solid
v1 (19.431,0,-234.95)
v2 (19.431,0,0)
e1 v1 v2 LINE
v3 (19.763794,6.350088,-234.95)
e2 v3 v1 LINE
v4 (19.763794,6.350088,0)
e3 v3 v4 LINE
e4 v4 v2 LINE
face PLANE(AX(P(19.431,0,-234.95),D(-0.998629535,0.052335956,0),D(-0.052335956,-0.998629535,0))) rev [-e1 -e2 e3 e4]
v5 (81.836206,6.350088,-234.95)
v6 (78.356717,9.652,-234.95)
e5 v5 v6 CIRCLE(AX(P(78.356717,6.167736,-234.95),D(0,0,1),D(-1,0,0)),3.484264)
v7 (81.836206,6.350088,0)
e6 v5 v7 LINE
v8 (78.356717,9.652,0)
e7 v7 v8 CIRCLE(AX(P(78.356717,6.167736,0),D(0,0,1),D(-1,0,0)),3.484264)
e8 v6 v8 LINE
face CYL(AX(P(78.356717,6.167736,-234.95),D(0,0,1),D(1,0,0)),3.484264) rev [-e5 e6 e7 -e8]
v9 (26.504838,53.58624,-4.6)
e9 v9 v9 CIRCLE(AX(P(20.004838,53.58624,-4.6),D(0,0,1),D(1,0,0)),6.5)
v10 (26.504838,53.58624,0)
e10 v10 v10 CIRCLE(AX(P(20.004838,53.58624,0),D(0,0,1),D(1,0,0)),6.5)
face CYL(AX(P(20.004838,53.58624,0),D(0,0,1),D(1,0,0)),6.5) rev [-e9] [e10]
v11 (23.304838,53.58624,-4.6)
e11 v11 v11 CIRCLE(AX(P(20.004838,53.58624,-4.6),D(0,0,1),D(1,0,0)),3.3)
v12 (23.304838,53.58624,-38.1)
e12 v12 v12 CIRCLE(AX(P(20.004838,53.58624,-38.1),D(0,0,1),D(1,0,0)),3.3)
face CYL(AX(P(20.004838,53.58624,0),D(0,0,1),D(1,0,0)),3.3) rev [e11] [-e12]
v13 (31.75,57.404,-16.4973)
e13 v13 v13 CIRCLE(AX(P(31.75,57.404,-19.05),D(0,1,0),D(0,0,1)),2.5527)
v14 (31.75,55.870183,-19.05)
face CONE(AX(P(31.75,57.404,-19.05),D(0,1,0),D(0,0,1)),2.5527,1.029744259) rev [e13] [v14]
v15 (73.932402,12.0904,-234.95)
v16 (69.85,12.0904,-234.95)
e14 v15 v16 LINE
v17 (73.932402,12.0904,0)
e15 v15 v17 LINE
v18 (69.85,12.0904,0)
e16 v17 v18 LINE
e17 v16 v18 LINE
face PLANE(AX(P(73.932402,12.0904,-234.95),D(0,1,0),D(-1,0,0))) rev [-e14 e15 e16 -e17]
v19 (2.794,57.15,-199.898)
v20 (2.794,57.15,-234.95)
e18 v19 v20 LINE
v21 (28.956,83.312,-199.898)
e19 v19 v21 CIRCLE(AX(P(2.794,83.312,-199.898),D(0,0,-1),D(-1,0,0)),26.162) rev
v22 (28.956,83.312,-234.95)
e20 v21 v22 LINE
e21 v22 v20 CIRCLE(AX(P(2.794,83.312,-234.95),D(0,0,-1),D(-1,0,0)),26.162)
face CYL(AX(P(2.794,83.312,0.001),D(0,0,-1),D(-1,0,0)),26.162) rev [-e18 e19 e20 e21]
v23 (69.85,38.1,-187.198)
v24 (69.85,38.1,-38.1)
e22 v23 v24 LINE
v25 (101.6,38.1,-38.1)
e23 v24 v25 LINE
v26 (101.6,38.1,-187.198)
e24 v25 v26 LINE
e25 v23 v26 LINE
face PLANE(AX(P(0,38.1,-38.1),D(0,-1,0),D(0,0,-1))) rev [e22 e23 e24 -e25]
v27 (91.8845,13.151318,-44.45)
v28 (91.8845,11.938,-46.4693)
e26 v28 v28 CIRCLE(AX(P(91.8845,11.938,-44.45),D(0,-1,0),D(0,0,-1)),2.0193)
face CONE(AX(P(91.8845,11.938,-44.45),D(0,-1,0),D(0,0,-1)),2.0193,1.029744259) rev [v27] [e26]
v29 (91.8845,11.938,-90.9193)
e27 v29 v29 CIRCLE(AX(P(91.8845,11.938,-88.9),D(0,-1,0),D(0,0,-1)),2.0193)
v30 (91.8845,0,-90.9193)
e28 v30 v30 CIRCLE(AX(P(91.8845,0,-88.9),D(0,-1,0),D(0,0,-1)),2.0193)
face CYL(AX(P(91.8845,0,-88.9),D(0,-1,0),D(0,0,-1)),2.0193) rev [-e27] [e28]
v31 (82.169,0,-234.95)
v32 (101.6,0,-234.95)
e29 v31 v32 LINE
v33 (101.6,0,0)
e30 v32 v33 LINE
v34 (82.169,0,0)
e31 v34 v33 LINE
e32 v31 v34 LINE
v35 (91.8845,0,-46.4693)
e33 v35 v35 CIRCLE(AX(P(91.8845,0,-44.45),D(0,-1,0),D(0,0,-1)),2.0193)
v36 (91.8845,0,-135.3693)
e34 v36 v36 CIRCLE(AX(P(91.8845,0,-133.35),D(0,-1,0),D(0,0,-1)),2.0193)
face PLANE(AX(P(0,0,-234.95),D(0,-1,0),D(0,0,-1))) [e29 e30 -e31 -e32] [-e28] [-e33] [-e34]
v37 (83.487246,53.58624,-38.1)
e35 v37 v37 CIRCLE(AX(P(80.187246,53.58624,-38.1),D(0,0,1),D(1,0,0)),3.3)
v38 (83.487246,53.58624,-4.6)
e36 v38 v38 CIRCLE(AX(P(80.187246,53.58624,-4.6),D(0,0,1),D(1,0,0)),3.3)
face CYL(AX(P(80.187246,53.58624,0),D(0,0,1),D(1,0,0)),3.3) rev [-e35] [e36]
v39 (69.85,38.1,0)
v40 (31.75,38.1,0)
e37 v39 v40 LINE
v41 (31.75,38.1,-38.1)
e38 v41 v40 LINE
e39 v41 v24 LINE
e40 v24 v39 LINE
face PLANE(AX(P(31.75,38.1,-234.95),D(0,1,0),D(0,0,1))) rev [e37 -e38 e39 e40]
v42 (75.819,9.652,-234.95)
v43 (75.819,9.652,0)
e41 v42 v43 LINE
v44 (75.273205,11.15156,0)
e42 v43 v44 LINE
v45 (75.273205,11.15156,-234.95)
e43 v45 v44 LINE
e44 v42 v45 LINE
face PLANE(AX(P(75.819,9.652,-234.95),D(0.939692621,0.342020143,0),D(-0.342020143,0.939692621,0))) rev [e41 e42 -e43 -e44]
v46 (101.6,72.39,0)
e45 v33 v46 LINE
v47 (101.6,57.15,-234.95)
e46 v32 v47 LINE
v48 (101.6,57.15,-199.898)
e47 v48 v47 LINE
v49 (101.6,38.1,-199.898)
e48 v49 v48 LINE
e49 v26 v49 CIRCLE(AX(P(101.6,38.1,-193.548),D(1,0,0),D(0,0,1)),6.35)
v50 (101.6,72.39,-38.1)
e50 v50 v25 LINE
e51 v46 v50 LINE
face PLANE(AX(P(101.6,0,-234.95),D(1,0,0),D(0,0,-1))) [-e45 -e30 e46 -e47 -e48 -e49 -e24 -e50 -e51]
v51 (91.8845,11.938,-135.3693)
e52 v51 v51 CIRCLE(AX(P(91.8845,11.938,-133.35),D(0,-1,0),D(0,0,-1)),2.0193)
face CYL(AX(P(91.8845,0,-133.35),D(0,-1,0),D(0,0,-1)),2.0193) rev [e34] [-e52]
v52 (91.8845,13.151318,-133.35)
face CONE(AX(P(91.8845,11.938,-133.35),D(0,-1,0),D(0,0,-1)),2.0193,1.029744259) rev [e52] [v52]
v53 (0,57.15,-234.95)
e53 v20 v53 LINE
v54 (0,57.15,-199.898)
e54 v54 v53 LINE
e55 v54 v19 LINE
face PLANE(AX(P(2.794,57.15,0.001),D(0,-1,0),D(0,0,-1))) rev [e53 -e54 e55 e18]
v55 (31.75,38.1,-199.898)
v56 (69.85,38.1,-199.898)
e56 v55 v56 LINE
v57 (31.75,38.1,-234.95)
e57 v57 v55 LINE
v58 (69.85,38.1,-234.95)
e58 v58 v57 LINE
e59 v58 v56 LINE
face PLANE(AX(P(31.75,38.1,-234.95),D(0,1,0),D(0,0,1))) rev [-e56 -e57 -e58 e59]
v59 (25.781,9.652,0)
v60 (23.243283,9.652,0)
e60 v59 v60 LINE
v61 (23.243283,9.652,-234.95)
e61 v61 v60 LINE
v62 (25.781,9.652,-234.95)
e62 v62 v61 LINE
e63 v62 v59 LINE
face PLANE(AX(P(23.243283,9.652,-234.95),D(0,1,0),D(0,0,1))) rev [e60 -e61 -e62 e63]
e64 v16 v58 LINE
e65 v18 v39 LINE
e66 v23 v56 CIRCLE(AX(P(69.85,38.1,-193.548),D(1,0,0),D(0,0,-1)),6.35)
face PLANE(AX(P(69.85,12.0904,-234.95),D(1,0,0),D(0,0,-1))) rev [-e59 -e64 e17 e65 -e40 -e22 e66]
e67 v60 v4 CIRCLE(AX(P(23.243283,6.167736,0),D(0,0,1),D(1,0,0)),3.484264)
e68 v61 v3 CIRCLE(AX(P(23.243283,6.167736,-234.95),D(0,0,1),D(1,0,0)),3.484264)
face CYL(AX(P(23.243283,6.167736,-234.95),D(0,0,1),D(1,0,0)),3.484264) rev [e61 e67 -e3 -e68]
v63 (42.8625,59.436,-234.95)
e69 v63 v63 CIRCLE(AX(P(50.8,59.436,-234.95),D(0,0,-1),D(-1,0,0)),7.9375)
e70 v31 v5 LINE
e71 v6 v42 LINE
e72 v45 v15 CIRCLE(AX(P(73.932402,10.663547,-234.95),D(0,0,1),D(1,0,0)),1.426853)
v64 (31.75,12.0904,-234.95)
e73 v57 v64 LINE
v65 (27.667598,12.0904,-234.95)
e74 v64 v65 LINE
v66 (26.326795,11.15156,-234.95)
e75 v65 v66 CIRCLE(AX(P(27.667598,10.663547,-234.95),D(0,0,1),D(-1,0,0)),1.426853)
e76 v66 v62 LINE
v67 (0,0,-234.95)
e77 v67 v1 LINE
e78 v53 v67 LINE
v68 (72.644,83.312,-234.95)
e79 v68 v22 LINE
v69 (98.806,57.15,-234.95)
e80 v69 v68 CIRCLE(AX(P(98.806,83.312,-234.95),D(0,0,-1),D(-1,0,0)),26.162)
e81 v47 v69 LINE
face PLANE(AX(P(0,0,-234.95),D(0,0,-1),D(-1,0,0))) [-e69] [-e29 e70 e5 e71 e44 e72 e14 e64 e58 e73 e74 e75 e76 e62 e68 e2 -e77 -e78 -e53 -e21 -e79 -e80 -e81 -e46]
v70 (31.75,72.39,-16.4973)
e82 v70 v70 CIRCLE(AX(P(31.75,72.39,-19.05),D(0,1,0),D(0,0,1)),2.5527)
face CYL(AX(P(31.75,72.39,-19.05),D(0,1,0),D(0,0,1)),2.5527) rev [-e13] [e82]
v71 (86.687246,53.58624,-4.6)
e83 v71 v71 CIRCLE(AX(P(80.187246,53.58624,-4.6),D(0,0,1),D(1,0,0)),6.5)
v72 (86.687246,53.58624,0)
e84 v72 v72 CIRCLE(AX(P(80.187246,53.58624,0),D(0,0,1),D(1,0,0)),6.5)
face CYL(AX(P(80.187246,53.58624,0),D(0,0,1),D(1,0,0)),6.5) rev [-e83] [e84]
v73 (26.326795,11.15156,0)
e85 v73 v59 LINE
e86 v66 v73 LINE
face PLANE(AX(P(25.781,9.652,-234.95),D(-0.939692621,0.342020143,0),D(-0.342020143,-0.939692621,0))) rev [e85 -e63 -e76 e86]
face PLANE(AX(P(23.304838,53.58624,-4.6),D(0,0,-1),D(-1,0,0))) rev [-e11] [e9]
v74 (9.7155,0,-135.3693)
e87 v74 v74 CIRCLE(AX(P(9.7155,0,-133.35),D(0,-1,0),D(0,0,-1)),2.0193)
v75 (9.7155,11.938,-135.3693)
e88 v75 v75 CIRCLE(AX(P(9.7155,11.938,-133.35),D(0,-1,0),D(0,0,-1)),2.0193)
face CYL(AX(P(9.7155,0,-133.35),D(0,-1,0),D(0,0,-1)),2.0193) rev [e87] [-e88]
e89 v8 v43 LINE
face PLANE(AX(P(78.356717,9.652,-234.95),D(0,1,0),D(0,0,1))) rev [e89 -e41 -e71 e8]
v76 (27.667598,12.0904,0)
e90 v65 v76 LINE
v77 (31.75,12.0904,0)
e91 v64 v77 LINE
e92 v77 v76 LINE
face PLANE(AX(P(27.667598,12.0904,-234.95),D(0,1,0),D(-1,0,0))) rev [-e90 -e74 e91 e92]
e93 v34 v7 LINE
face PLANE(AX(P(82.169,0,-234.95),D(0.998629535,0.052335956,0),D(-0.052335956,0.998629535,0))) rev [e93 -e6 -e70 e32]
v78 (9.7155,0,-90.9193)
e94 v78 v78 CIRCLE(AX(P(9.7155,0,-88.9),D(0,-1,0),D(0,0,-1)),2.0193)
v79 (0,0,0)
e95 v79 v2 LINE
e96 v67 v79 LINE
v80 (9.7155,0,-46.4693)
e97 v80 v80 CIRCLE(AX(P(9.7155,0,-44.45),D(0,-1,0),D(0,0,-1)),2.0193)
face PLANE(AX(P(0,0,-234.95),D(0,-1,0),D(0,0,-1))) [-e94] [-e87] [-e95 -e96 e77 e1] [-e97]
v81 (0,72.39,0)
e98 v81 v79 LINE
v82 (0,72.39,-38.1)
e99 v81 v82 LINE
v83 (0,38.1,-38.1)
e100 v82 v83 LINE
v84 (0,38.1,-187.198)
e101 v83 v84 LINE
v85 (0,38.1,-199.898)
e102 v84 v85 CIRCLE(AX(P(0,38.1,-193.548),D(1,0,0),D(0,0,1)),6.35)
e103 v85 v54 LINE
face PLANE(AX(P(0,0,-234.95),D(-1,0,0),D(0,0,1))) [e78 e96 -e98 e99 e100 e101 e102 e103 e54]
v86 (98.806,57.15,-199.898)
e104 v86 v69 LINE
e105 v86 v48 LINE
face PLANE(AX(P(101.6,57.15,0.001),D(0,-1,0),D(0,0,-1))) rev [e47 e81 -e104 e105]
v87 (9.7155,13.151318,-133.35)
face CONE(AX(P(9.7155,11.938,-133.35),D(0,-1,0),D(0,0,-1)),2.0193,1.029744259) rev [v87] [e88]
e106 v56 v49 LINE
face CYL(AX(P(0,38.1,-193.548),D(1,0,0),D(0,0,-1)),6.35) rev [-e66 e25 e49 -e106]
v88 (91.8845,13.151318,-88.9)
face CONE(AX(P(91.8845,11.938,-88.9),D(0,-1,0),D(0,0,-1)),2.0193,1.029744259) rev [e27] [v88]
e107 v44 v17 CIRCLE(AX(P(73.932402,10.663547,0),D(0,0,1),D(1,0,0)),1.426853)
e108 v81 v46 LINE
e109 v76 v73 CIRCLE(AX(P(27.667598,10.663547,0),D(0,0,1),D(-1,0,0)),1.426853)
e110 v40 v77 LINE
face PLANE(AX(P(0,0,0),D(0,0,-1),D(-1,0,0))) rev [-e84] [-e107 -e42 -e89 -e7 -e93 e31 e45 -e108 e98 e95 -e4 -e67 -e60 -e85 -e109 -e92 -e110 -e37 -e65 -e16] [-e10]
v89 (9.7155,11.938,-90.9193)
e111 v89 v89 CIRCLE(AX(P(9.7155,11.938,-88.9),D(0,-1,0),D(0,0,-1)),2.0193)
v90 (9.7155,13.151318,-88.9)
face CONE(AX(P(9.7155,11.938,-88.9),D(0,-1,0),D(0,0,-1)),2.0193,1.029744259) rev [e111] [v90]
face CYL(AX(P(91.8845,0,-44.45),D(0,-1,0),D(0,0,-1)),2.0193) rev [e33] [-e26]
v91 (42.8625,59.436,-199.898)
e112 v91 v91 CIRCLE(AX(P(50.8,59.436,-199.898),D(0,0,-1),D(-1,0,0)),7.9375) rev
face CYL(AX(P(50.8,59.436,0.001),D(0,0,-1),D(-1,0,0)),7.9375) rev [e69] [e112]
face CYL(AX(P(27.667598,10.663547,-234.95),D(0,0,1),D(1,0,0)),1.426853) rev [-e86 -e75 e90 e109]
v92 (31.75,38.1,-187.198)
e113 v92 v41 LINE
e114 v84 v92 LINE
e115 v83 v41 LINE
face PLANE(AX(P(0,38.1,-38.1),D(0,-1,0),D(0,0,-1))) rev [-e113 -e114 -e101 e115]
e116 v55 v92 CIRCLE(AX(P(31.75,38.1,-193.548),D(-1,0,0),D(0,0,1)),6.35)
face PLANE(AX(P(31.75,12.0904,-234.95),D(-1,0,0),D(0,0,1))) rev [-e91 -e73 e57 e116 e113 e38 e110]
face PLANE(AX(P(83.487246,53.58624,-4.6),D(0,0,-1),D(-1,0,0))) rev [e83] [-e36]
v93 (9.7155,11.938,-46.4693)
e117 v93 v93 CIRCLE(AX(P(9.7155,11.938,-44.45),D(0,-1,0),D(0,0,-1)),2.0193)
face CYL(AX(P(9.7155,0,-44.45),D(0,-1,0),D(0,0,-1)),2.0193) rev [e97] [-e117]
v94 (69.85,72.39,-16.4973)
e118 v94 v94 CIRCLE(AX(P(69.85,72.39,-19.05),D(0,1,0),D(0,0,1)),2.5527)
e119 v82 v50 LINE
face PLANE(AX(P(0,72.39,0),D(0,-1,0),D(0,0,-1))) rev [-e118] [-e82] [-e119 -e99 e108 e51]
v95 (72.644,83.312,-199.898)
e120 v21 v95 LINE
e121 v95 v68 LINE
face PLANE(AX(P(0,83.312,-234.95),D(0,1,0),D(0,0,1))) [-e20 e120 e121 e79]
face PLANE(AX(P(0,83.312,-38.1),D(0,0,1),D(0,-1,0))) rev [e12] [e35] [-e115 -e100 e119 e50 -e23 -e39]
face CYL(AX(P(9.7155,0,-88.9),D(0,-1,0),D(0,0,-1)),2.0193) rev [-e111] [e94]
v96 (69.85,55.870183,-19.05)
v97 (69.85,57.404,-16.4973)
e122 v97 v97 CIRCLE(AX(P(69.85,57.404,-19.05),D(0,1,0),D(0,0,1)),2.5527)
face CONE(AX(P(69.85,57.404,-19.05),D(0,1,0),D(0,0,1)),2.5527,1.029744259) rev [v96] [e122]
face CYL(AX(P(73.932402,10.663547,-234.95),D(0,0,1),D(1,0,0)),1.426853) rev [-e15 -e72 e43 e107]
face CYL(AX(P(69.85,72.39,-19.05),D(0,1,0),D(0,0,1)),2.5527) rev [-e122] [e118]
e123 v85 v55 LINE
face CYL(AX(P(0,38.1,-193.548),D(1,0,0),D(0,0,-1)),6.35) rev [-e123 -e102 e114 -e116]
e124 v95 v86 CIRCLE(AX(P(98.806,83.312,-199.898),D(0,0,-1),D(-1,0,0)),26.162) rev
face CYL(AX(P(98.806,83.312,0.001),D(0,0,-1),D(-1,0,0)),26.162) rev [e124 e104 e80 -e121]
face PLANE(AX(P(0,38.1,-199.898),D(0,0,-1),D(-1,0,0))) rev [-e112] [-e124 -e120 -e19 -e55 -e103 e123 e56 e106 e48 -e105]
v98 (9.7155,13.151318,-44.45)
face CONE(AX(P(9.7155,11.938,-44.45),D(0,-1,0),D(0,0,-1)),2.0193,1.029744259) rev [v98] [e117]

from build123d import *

# Parameters (mm, degrees)
SKETCH1_W                                    = 101.6
SKETCH1_H                                    = 83.312
SOLID_EXTRUDE_DEPTH                          = 234.95
BOTTOM_SLIDE_WAY_CUT_EXTRUDE_DEPTH           = 270.193149697
THROAT_CASTING_CUT_EXTRUDE_DEPTH             = 270.193149697
SHOULDERS_SCREW_HOLE_CUT_EXTRUDE_REACH       = 271.193
SKETCH4_R                                    = 7.9375
CBORE_START                                  = -38.1
CBORE_FOR_M6_PAN_HEAD_MACHINE_SCREW1_OUT_R   = 3.3
CBORE_FOR_M6_PAN_HEAD_MACHINE_SCREW1_DEPTH   = 38.1
CBORE_START_2                                = -4.6
CBORE_FOR_M6_PAN_HEAD_MACHINE_SCREW1_2_O_R   = 6.5
CBORE_FOR_M6_PAN_HEAD_MACHINE_SCREW1_2_O_R_2 = 3.3
CBORE_FOR_M6_PAN_HEAD_MACHINE_SCREW1_2_DEPTH = 4.6
SKETCH7_W                                    = 38.1
SKETCH7_H                                    = 10.922
STATIONARY_JAW_TRIM_CUT_EXTRUDE1_DEPTH       = 270.193149697
F_1_4_20_TAPPED_HOLE1_D                      = 5.1054
F_1_4_20_TAPPED_HOLE1_DEPTH                  = 14.986
F_1_4_20_TAPPED_HOLE1_TIP                    = 1.533816902
F_10_32_TAPPED_HOLE1_D                       = 4.0386
F_10_32_TAPPED_HOLE1_DEPTH                   = 11.938
F_10_32_TAPPED_HOLE1_TIP                     = 1.213317848


# Read off the part's stored shape, not the designer's step: CBORE for M6 Pan Head Machine Screw1
with BuildPart() as part:
    # Sketch1 → Solid extrude (new body)
    with BuildSketch(Plane.XY):
        with Locations((50.8, 41.656)):
            Rectangle(SKETCH1_W, SKETCH1_H)
    extrude(amount=-SOLID_EXTRUDE_DEPTH)

    # Sketch2 → Bottom slide way cut extrude (cut, through all)
    with BuildSketch(Plane.XY):
        with BuildLine():
            Line((19.431, 0), (19.763794004, 6.35008787))
            ThreePointArc((19.763794004, 6.35008787), (20.84487401, 8.695131686), (23.243283382, 9.652))
            Line((23.243283382, 9.652), (25.781, 9.652))
            Line((25.781, 9.652), (26.326795038, 11.151559542))
            ThreePointArc((26.326795038, 11.151559542), (26.849188972, 11.832356572), (27.667598166, 12.0904))
            Line((27.667598166, 12.0904), (31.75, 12.0904))
            Line((31.75, 12.0904), (31.75, 38.1))
            Line((31.75, 38.1), (69.85, 38.1))
            Line((69.85, 38.1), (69.85, 12.0904))
            Line((69.85, 12.0904), (73.932401834, 12.0904))
            ThreePointArc((73.932401834, 12.0904), (74.750811028, 11.832356572), (75.273204962, 11.151559542))
            Line((75.273204962, 11.151559542), (75.819, 9.652))
            Line((75.819, 9.652), (78.356716618, 9.652))
            ThreePointArc((78.356716618, 9.652), (80.75512599, 8.695131686), (81.836205996, 6.35008787))
            Line((81.836205996, 6.35008787), (82.169, 0))
            Line((82.169, 0), (19.431, 0))
        make_face()
    extrude(amount=-BOTTOM_SLIDE_WAY_CUT_EXTRUDE_DEPTH, mode=Mode.SUBTRACT)

    # Sketch3 → Throat/casting cut extrude (cut, through all)
    with BuildSketch(Plane(origin=(101.6, 0, 0), x_dir=(0, 0, -1), z_dir=(1, 0, 0))):
        with BuildLine():
            Line((0, 74.58075), (19.05, 74.58075))
            ThreePointArc((19.05, 74.58075), (23.540128061, 76.440621939), (25.4, 80.93075))
            Line((25.4, 80.93075), (25.4, 83.312))
            Line((25.4, 83.312), (0, 83.312))
            Line((0, 83.312), (0, 74.58075))
        make_face()
        with BuildLine():
            Line((38.1, 83.312), (38.1, 38.1))
            Line((38.1, 38.1), (187.198, 38.1))
            ThreePointArc((187.198, 38.1), (193.548, 31.75), (199.898, 38.1))
            Line((199.898, 38.1), (199.898, 83.312))
            Line((199.898, 83.312), (38.1, 83.312))
        make_face()
    extrude(amount=-THROAT_CASTING_CUT_EXTRUDE_DEPTH, mode=Mode.SUBTRACT)

    # Sketch4 → Shoulders/screw hole cut extrude (cut, up to next)
    with BuildSketch(Plane(origin=(0, 0, -234.95), x_dir=(-1, 0, 0), z_dir=(0, 0, -1)), mode=Mode.PRIVATE) as shoulders_screw_hole_cut_extrude_sk1:
        with Locations((-50.8, 59.436)):
            Circle(SKETCH4_R)
    shoulders_screw_hole_cut_extrude_tool1 = extrude(shoulders_screw_hole_cut_extrude_sk1.sketch, amount=-SHOULDERS_SCREW_HOLE_CUT_EXTRUDE_REACH, mode=Mode.PRIVATE) & part.part
    # Sketch4 → Shoulders/screw hole cut extrude (cut, up to next)
    with BuildSketch(Plane(origin=(0, 0, -234.95), x_dir=(-1, 0, 0), z_dir=(0, 0, -1)), mode=Mode.PRIVATE) as shoulders_screw_hole_cut_extrude_sk2:
        with BuildLine():
            Line((-2.794, 57.15), (0, 57.15))
            Line((0, 57.15), (0, 83.312))
            Line((0, 83.312), (-28.956, 83.312))
            ThreePointArc((-28.956, 83.312), (-21.293327609, 64.812672391), (-2.794, 57.15))
        make_face()
    shoulders_screw_hole_cut_extrude_tool2 = extrude(shoulders_screw_hole_cut_extrude_sk2.sketch, amount=-SHOULDERS_SCREW_HOLE_CUT_EXTRUDE_REACH, mode=Mode.PRIVATE) & part.part
    # Sketch4 → Shoulders/screw hole cut extrude (cut, up to next)
    with BuildSketch(Plane(origin=(0, 0, -234.95), x_dir=(-1, 0, 0), z_dir=(0, 0, -1)), mode=Mode.PRIVATE) as shoulders_screw_hole_cut_extrude_sk3:
        with BuildLine():
            Line((-101.6, 57.15), (-101.6, 83.312))
            Line((-101.6, 83.312), (-72.644, 83.312))
            ThreePointArc((-72.644, 83.312), (-80.306672391, 64.812672391), (-98.806, 57.15))
            Line((-98.806, 57.15), (-101.6, 57.15))
        make_face()
    shoulders_screw_hole_cut_extrude_tool3 = extrude(shoulders_screw_hole_cut_extrude_sk3.sketch, amount=-SHOULDERS_SCREW_HOLE_CUT_EXTRUDE_REACH, mode=Mode.PRIVATE) & part.part
    add(shoulders_screw_hole_cut_extrude_tool1.solids().sort_by_distance((50.8, 59.436, -234.95))[0], mode=Mode.SUBTRACT)
    add(shoulders_screw_hole_cut_extrude_tool2.solids().sort_by_distance((12.401182, 71.971794, -234.95))[0], mode=Mode.SUBTRACT)
    add(shoulders_screw_hole_cut_extrude_tool3.solids().sort_by_distance((89.198818, 71.971794, -234.95))[0], mode=Mode.SUBTRACT)

    # CBORE for M6 Pan Head Machine Screw1 out → CBORE for M6 Pan Head Machine Screw1 (cut)
    with BuildSketch(Plane.XY.offset(CBORE_START)):
        with Locations((80.187245779, 53.586240129)):
            Circle(CBORE_FOR_M6_PAN_HEAD_MACHINE_SCREW1_OUT_R)
        with Locations((20.004838326, 53.586240129)):
            Circle(CBORE_FOR_M6_PAN_HEAD_MACHINE_SCREW1_OUT_R)
    extrude(amount=CBORE_FOR_M6_PAN_HEAD_MACHINE_SCREW1_DEPTH, mode=Mode.SUBTRACT)

    # CBORE for M6 Pan Head Machine Screw1 2 o → CBORE for M6 Pan Head Machine Screw1 2 (cut)
    # profile 1 of 2: a face of its own
    with BuildSketch(Plane.XY.offset(CBORE_START_2)):
        with Locations((80.187245779, 53.586240129)):
            Circle(CBORE_FOR_M6_PAN_HEAD_MACHINE_SCREW1_2_O_R)
        with Locations((80.187245779, 53.586240129)):
            Circle(CBORE_FOR_M6_PAN_HEAD_MACHINE_SCREW1_2_O_R_2, mode=Mode.SUBTRACT)
    # profile 2 of 2: a face of its own
    with BuildSketch(Plane.XY.offset(CBORE_START_2)):
        with Locations((20.004838326, 53.586240129)):
            Circle(CBORE_FOR_M6_PAN_HEAD_MACHINE_SCREW1_2_O_R)
        with Locations((20.004838326, 53.586240129)):
            Circle(CBORE_FOR_M6_PAN_HEAD_MACHINE_SCREW1_2_O_R_2, mode=Mode.SUBTRACT)
    extrude(amount=CBORE_FOR_M6_PAN_HEAD_MACHINE_SCREW1_2_DEPTH, mode=Mode.SUBTRACT)

    # Sketch7 → Stationary jaw trim Cut-Extrude1 (cut, through all)
    with BuildSketch(Plane(origin=(101.6, 0, 0), x_dir=(0, 0, -1), z_dir=(1, 0, 0))):
        with Locations((19.05, 77.851)):
            Rectangle(SKETCH7_W, SKETCH7_H)
    extrude(amount=-STATIONARY_JAW_TRIM_CUT_EXTRUDE1_DEPTH, mode=Mode.SUBTRACT)

    # 1/4-20 Tapped Hole1
    with Locations(Plane(origin=(50.8, 72.39, 0), x_dir=(-1, 0, 0), z_dir=(0, 1, 0))):
        with Locations((19.05, -19.05), (-19.05, -19.05)):
            Hole(F_1_4_20_TAPPED_HOLE1_D / 2, depth=F_1_4_20_TAPPED_HOLE1_DEPTH)
            with Locations((0, 0, -(F_1_4_20_TAPPED_HOLE1_DEPTH + F_1_4_20_TAPPED_HOLE1_TIP / 2))):  # 118° drill point
                Cone(0, F_1_4_20_TAPPED_HOLE1_D / 2, F_1_4_20_TAPPED_HOLE1_TIP, mode=Mode.SUBTRACT)

    # #10-32 Tapped Hole1
    with Locations(Plane(origin=(0, 0, 0), x_dir=(-1, 0, 0), z_dir=(0, -1, 0))):
        with Locations((-9.7155, 88.9), (-9.7155, 44.45), (-9.7155, 133.35), (-91.8845, 44.45), (-91.8845, 88.9), (-91.8845, 133.35)):
            Hole(F_10_32_TAPPED_HOLE1_D / 2, depth=F_10_32_TAPPED_HOLE1_DEPTH)
            with Locations((0, 0, -(F_10_32_TAPPED_HOLE1_DEPTH + F_10_32_TAPPED_HOLE1_TIP / 2))):  # 118° drill point
                Cone(0, F_10_32_TAPPED_HOLE1_D / 2, F_10_32_TAPPED_HOLE1_TIP, mode=Mode.SUBTRACT)


solid = part.part
